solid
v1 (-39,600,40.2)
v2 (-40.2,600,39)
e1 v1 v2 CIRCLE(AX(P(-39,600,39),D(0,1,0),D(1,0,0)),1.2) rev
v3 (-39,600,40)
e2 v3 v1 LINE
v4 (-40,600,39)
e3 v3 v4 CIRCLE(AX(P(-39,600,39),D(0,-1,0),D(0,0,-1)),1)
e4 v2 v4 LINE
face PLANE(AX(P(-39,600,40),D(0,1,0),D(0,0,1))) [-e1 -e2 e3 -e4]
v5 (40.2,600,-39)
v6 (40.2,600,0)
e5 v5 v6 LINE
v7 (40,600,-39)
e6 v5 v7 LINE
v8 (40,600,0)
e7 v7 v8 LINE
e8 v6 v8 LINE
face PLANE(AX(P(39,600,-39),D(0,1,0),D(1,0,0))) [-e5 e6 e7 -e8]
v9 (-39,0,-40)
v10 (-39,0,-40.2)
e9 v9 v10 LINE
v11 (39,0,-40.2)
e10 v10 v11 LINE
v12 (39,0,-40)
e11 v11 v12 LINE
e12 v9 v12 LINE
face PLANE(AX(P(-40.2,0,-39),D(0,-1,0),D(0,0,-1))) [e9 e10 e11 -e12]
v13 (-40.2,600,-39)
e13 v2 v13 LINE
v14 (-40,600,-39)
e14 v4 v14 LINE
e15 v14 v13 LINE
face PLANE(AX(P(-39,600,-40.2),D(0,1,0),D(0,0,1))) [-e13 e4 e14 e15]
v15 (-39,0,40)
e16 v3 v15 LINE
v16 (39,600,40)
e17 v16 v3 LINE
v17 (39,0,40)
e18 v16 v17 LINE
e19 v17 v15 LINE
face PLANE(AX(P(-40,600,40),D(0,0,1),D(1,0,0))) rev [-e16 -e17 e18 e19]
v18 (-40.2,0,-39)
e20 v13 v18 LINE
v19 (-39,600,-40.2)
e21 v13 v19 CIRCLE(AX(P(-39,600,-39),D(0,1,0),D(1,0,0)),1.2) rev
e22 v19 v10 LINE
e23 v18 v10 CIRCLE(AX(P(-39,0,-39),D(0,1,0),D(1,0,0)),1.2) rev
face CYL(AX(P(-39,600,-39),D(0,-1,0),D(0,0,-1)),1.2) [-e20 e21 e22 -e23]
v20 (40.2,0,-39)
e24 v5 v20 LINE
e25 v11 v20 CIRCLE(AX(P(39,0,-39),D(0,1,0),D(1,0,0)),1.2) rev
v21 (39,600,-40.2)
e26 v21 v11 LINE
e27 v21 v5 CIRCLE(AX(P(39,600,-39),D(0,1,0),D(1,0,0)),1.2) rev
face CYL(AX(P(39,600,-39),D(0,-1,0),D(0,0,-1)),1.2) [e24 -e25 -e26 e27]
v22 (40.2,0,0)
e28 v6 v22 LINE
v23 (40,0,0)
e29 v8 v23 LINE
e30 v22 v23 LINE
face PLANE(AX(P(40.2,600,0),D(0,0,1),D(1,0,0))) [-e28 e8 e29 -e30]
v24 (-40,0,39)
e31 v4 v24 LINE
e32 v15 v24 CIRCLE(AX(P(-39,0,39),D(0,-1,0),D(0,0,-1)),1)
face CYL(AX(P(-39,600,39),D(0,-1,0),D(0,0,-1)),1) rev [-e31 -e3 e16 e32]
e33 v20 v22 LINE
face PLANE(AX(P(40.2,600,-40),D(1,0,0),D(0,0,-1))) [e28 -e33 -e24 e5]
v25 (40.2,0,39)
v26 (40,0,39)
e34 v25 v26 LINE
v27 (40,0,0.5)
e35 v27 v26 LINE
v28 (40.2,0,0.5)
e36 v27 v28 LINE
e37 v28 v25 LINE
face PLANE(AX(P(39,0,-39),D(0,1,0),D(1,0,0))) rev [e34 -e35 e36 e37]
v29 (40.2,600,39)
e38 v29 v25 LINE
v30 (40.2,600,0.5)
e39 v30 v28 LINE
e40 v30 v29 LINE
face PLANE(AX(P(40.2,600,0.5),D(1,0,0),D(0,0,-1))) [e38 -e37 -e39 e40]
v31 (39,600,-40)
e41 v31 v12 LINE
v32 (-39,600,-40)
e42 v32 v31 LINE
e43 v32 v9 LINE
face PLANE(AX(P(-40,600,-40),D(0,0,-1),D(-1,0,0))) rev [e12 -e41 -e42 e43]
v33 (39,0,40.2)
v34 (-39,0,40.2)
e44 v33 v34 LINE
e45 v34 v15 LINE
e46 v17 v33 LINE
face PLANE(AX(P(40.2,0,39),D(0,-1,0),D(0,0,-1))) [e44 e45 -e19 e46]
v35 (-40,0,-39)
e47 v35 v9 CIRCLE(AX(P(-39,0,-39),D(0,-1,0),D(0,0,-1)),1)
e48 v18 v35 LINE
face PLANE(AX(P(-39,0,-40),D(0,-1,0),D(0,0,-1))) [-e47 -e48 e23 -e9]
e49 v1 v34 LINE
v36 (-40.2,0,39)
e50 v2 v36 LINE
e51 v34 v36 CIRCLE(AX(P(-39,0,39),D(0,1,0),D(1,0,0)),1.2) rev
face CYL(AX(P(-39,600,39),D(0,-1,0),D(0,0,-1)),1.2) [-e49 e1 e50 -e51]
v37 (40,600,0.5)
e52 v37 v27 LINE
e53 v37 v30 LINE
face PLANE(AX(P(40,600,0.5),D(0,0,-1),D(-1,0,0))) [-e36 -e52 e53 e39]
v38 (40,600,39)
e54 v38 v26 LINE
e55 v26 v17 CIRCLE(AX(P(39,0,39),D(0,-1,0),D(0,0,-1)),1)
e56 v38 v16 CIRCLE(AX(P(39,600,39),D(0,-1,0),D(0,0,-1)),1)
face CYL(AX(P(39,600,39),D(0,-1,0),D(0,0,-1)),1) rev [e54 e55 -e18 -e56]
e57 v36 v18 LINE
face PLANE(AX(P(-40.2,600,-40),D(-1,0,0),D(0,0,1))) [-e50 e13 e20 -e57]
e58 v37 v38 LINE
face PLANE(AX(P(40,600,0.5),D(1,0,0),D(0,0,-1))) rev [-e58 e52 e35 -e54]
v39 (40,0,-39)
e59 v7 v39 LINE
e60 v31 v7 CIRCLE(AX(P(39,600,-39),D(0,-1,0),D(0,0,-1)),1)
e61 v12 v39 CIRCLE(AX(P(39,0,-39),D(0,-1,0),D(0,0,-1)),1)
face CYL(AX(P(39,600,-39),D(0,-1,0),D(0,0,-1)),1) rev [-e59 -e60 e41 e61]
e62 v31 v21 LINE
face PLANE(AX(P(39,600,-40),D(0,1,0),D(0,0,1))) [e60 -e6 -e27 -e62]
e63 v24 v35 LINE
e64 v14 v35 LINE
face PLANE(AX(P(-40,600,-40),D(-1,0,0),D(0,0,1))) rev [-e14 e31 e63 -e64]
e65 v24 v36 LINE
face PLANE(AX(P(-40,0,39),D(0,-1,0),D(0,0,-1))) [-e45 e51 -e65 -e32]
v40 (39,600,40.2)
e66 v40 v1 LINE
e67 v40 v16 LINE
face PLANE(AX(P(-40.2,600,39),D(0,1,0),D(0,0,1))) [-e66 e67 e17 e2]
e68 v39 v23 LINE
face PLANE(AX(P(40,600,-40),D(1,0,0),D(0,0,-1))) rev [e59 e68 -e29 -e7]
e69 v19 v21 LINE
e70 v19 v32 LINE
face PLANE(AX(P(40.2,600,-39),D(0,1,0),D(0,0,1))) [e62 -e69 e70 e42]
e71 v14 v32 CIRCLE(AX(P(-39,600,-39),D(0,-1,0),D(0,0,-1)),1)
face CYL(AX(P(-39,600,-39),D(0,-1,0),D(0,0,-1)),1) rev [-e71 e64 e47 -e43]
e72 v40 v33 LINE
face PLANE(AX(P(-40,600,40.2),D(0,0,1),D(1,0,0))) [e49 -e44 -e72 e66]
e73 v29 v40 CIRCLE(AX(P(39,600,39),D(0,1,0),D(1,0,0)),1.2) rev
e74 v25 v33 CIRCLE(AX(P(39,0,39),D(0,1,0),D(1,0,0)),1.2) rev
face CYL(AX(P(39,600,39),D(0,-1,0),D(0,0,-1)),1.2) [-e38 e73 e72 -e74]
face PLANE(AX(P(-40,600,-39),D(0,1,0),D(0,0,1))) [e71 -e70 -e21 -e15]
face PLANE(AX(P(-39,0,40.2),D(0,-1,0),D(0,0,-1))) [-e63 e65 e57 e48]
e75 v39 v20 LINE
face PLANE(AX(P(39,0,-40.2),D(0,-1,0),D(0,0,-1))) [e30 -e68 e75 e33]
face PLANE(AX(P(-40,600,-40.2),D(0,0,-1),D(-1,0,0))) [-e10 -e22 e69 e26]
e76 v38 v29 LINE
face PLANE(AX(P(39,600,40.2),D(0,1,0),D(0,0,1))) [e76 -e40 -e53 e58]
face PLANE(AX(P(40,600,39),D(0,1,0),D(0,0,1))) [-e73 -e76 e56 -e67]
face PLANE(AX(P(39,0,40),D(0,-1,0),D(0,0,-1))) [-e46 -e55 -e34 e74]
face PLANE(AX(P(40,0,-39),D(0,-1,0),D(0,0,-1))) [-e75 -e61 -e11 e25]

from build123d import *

# Parameters (mm, degrees)
SM_BASE_FLANGE_1_DEPTH = 600


# Sheet-metal steps are written as plain solids
with BuildPart() as part:
    # Sketch 1 → 基体-法兰1 (new body)
    with BuildSketch(Plane(origin=(0, 0, 0), x_dir=(1, 0, 0), z_dir=(0, 1, 0))):
        with BuildLine():
            Line((40, -0.5), (40, -39))
            ThreePointArc((40, -39), (39.707106781, -39.707106781), (39, -40))
            Line((39, -40), (-39, -40))
            ThreePointArc((-39, -40), (-39.707106781, -39.707106781), (-40, -39))
            Line((-40, -39), (-40, 39))
            ThreePointArc((-40, 39), (-39.707106781, 39.707106781), (-39, 40))
            Line((-39, 40), (39, 40))
            ThreePointArc((39, 40), (39.707106781, 39.707106781), (40, 39))
            Line((40, 39), (40, 0))
            Line((40, 0), (40.2, 0))
            Line((40.2, 0), (40.2, 39))
            ThreePointArc((40.2, 39), (39.848528137, 39.848528137), (39, 40.2))
            Line((39, 40.2), (-39, 40.2))
            ThreePointArc((-39, 40.2), (-39.848528137, 39.848528137), (-40.2, 39))
            Line((-40.2, 39), (-40.2, -39))
            ThreePointArc((-40.2, -39), (-39.848528137, -39.848528137), (-39, -40.2))
            Line((-39, -40.2), (39, -40.2))
            ThreePointArc((39, -40.2), (39.848528137, -39.848528137), (40.2, -39))
            Line((40.2, -39), (40.2, -0.5))
            Line((40.2, -0.5), (40, -0.5))
        make_face()
    extrude(amount=SM_BASE_FLANGE_1_DEPTH)


solid = part.part
